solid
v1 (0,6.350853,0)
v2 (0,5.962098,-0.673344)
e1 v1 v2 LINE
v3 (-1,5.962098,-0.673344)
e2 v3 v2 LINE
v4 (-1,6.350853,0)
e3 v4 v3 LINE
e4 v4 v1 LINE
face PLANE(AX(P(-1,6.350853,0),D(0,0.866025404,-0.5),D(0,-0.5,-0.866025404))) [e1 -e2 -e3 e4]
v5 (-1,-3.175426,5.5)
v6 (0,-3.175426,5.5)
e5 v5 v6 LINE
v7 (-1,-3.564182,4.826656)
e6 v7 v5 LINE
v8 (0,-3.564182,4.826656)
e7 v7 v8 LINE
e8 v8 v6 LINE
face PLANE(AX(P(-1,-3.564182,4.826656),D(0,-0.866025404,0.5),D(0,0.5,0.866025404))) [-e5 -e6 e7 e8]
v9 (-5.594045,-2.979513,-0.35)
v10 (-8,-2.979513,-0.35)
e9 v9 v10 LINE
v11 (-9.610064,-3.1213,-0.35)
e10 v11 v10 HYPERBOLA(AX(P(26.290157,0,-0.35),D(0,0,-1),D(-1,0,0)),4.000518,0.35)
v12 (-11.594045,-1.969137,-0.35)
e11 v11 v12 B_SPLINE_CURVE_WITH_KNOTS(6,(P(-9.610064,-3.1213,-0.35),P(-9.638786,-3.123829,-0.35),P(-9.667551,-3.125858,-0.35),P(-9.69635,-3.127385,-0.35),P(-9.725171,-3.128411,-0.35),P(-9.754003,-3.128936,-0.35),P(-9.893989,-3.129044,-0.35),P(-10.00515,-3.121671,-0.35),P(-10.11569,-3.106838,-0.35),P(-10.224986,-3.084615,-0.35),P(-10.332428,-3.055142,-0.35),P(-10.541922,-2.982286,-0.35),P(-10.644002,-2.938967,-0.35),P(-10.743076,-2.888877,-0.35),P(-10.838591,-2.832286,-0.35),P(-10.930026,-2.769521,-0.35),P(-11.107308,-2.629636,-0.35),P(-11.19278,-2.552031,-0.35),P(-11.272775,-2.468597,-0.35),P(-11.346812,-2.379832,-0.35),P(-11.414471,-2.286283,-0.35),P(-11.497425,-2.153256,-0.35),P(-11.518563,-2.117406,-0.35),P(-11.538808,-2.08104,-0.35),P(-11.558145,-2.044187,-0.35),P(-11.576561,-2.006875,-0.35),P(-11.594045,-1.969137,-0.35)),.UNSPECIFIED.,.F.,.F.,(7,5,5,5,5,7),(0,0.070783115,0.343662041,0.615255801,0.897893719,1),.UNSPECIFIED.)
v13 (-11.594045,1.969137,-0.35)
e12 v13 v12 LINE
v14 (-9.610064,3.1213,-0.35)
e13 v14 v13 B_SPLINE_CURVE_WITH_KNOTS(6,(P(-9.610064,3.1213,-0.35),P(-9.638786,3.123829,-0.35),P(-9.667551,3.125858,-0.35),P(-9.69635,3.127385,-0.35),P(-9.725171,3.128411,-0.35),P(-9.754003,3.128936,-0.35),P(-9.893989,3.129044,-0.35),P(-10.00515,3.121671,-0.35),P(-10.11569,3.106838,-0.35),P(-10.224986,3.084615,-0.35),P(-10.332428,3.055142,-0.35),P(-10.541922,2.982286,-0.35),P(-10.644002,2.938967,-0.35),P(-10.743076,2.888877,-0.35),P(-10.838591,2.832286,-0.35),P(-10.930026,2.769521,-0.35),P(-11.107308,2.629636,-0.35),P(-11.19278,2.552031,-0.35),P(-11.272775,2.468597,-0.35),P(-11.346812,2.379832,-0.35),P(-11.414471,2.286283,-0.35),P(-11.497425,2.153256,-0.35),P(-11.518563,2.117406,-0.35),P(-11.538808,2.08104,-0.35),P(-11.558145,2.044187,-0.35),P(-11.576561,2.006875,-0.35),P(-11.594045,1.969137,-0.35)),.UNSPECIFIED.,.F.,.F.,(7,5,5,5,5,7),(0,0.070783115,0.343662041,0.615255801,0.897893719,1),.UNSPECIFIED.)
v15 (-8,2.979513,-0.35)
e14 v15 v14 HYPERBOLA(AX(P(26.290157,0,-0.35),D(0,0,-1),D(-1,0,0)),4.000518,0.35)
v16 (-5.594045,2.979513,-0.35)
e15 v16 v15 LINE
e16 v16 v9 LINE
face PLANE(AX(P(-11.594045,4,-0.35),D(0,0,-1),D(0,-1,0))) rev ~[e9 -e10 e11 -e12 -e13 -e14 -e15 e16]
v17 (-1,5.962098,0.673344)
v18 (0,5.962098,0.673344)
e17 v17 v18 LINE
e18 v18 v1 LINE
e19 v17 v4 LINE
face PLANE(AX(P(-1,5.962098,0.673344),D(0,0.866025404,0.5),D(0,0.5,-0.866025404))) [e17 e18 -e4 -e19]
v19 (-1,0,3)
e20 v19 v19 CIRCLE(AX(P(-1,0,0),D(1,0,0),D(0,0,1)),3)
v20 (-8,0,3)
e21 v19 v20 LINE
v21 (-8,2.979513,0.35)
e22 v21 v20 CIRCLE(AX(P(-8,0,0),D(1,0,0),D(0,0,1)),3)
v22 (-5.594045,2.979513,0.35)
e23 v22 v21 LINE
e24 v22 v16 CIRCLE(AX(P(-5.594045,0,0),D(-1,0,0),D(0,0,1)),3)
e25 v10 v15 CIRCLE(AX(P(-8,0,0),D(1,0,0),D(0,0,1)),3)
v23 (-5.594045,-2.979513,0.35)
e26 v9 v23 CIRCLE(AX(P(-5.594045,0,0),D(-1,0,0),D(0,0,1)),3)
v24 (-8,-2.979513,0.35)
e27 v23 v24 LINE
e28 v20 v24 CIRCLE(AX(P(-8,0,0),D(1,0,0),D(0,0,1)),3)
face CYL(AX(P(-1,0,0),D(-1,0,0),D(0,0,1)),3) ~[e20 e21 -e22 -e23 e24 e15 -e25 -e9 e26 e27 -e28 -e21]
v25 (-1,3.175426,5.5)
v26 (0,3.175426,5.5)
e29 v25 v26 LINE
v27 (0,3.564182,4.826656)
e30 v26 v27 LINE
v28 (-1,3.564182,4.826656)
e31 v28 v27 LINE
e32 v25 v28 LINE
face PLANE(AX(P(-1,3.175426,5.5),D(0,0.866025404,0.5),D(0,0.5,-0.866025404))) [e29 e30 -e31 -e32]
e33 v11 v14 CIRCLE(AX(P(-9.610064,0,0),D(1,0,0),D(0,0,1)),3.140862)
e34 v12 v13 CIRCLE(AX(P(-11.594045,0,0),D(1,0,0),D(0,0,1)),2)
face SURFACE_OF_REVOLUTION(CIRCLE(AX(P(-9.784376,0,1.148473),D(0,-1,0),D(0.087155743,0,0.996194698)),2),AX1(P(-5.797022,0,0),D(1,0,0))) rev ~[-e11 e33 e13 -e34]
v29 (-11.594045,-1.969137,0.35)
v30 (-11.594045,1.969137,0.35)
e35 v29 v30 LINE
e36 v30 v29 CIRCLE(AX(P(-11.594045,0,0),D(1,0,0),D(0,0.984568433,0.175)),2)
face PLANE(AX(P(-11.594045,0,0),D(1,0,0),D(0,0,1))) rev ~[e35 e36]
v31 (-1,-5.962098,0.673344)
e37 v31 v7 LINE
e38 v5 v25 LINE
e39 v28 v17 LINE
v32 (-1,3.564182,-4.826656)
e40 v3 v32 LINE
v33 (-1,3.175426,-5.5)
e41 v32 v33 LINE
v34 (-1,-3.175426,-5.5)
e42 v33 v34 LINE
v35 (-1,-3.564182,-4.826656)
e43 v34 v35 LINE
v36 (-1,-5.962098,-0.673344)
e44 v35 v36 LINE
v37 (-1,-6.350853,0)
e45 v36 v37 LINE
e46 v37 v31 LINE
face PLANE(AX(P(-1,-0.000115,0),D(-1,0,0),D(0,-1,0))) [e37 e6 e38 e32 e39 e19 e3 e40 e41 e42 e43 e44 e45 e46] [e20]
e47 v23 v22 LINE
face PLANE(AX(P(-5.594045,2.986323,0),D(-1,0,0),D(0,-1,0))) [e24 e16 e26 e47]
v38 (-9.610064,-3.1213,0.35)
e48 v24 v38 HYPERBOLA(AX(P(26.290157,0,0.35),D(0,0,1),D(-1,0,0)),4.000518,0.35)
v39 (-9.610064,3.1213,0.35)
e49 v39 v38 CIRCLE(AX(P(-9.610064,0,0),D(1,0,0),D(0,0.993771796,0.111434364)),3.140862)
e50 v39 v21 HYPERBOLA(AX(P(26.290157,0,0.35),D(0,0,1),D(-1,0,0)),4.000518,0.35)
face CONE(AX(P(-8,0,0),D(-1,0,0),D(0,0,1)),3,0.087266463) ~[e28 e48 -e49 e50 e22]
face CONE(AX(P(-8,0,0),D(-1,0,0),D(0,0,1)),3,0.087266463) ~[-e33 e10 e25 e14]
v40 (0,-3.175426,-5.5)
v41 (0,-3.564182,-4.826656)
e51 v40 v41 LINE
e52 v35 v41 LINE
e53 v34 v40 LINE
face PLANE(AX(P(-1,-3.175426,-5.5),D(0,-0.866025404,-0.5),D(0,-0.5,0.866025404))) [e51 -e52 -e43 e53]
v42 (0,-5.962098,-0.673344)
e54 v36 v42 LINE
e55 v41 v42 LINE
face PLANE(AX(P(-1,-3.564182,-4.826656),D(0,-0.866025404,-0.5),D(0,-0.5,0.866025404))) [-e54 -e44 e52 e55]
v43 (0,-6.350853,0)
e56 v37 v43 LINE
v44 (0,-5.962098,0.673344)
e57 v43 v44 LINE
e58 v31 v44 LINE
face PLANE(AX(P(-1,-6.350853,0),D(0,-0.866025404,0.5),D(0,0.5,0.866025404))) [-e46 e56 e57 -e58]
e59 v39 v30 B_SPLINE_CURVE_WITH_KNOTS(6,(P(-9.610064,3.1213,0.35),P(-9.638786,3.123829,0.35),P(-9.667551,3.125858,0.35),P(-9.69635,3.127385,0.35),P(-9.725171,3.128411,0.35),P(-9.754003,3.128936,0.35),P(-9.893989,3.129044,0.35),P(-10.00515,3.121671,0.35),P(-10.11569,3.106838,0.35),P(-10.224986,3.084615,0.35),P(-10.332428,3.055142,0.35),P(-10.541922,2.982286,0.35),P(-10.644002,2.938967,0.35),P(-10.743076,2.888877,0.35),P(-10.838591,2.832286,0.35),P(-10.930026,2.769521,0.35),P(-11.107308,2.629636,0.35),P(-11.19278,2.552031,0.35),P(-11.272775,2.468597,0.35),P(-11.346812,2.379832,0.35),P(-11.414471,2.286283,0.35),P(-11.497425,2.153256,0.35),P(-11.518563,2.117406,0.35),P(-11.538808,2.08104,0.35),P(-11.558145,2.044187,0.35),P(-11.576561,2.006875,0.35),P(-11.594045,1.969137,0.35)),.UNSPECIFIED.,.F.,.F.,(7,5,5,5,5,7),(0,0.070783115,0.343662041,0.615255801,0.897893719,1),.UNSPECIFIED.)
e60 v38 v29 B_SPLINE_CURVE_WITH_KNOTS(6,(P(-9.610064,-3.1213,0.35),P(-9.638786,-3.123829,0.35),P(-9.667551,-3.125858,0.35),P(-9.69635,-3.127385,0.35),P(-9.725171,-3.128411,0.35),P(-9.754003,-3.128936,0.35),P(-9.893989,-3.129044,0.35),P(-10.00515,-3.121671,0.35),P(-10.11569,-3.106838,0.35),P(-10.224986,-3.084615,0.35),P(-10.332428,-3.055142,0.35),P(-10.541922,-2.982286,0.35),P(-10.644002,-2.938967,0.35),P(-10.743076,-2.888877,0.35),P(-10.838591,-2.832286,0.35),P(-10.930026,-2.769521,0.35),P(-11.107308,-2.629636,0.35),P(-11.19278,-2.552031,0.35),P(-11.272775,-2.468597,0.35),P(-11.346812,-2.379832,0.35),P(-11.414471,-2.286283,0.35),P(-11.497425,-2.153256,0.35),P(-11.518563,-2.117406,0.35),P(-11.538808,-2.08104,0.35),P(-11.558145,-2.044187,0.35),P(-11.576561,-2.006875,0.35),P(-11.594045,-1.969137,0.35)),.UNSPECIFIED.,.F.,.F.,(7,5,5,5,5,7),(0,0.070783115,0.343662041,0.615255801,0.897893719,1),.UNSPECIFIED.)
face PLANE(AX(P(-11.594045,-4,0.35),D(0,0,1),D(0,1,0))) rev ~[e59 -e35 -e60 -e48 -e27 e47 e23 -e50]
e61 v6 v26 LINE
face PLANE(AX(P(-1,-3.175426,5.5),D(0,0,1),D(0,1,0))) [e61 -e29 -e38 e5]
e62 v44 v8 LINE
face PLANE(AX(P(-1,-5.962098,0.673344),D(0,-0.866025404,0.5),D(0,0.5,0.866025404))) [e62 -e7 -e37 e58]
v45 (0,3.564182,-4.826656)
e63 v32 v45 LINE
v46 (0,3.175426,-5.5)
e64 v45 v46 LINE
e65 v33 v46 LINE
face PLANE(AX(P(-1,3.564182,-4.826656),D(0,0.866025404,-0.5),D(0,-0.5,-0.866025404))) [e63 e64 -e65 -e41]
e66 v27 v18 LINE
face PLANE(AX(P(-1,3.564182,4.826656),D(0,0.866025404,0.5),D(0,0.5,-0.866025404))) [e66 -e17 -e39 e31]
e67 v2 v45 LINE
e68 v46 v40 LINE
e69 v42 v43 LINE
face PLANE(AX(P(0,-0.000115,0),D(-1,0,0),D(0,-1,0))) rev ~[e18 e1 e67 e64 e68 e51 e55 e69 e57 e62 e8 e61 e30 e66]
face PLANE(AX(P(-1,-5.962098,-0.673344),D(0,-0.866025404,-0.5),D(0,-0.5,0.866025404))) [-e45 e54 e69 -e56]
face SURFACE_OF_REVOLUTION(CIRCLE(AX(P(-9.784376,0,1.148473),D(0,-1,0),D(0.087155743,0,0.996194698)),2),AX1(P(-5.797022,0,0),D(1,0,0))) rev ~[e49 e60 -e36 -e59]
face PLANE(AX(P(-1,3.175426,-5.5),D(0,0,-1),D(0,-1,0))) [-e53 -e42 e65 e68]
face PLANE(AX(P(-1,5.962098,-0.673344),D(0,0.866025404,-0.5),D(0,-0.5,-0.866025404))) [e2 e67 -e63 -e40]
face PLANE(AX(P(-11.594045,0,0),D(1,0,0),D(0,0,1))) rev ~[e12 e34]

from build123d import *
from build123d import SkipClean  # not in build123d's __all__

# Parameters (mm, degrees)
F3_DEPTH = 6
F4_W     = 13.7017059222
F4_H     = 13
F4_R     = 3
F5_DEPTH = 25
F6_DEPTH = 1


with BuildPart() as f1:
    # F0 (on Front) → F1 (revolve)
    with BuildSketch(Plane.XZ):
        with BuildLine():
            Line((-11.5940445242, 0), (0, 0))
            Line((0, 0), (0, 6))
            Line((0, 6), (-1, 6))
            Line((-1, 6), (-1, 3))
            Line((-1, 3), (-8, 3))
            Line((-8, 3), (-9.6100640914, 3.1408623555))
            ThreePointArc((-9.6100640914, 3.1408623555), (-10.7813661664, 2.8822577685), (-11.5940445242, 2))
            Line((-11.5940445242, 2), (-11.5940445242, 0))
        make_face()
    revolve(axis=Axis((-5.7970222621, 0, 0), (1, 0, 0)))

    # F2 (on face) → F3 (cut)
    with BuildSketch(Plane(origin=(-11.5940445242, 0, 0), x_dir=(0, -1, 0), z_dir=(-1, 0, 0))):
        with BuildLine():
            ThreePointArc((-1.9691368668, -0.35), (-2, 0), (-1.9691368668, 0.35))
            Line((-1.9691368668, 0.35), (-4, 0.35))
            Line((-4, 0.35), (-4, -0.35))
            Line((-4, -0.35), (-2.9795133831, -0.35))
            Line((-2.9795133831, -0.35), (-1.9691368668, -0.35))
        make_face()
        with BuildLine():
            Line((1.9691368668, 0.35), (0.25, 0.35))
            Line((0.25, 0.35), (0.25, 0))
            Line((0.25, 0), (0.25, -0.35))
            Line((0.25, -0.35), (1.9691368668, -0.35))
            ThreePointArc((1.9691368668, -0.35), (1.9922692757, -0.1756790632), (2, 0))
            ThreePointArc((2, 0), (1.9922692757, 0.1756790632), (1.9691368668, 0.35))
        make_face()
        with BuildLine():
            Line((-0.25, 0), (-0.25, 0.35))
            Line((-0.25, 0.35), (-1.9691368668, 0.35))
            ThreePointArc((-1.9691368668, 0.35), (-2, 0), (-1.9691368668, -0.35))
            Line((-1.9691368668, -0.35), (-0.25, -0.35))
            Line((-0.25, -0.35), (-0.25, 0))
        make_face()
        Polygon((0.25, 0), (0.25, 0.35), (-0.25, 0.35), (-0.25, 0), (-0.25, -0.35), (0.25, -0.35), align=None)
        with BuildLine():
            Line((4, 0.35), (1.9691368668, 0.35))
            ThreePointArc((1.9691368668, 0.35), (1.9922692757, 0.1756790632), (2, 0))
            ThreePointArc((2, 0), (1.9922692757, -0.1756790632), (1.9691368668, -0.35))
            Line((1.9691368668, -0.35), (2.9795133831, -0.35))
            Line((2.9795133831, -0.35), (4, -0.35))
            Line((4, -0.35), (4, 0.35))
        make_face()
    extrude(amount=-F3_DEPTH, mode=Mode.SUBTRACT)

    # F4 (on face) → F5 (cut)
    with BuildSketch(Plane(origin=(-1, 0, 0), x_dir=(0, -1, 0), z_dir=(-1, 0, 0))):
        Rectangle(F4_W, F4_H)
        Polygon((-6.3508529611, 0), (-3.1754264805, 5.5), (3.1754264805, 5.5), (6.3508529611, 0), (3.1754264805, -5.5), (-3.1754264805, -5.5), align=None, mode=Mode.SUBTRACT)
        with BuildLine():
            Line((2.3979157617, 5.5), (-2.3979157617, 5.5))
            ThreePointArc((-2.3979157617, 5.5), (-3, 5.1961524227), (-3.56418184, 4.8266559657))
            Line((-3.56418184, 4.8266559657), (-5.9620976016, 0.6733440343))
            ThreePointArc((-5.9620976016, 0.6733440343), (-6, 0), (-5.9620976016, -0.6733440343))
            Line((-5.9620976016, -0.6733440343), (-3.56418184, -4.8266559657))
            ThreePointArc((-3.56418184, -4.8266559657), (-3, -5.1961524227), (-2.3979157617, -5.5))
            Line((-2.3979157617, -5.5), (2.3979157617, -5.5))
            ThreePointArc((2.3979157617, -5.5), (3, -5.1961524227), (3.56418184, -4.8266559657))
            Line((3.56418184, -4.8266559657), (5.9620976016, -0.6733440343))
            ThreePointArc((5.9620976016, -0.6733440343), (5.9905169063, -0.3372049749), (6, 0))
            ThreePointArc((6, 0), (5.9905169063, 0.3372049749), (5.9620976016, 0.6733440343))
            Line((5.9620976016, 0.6733440343), (3.56418184, 4.8266559657))
            ThreePointArc((3.56418184, 4.8266559657), (3, 5.1961524227), (2.3979157617, 5.5))
        make_face()
        Circle(F4_R, mode=Mode.SUBTRACT)
    with SkipClean():  # cleaning this boolean's faces spoils the solid; the shape is the same uncleaned
        extrude(amount=-F5_DEPTH, mode=Mode.SUBTRACT)

    # F4 (on face) → F6 (join)
    with BuildSketch(Plane(origin=(-1, 0, 0), x_dir=(0, -1, 0), z_dir=(-1, 0, 0))):
        with BuildLine():
            Line((2.3979157617, 5.5), (-2.3979157617, 5.5))
            ThreePointArc((-2.3979157617, 5.5), (-3, 5.1961524227), (-3.56418184, 4.8266559657))
            Line((-3.56418184, 4.8266559657), (-5.9620976016, 0.6733440343))
            ThreePointArc((-5.9620976016, 0.6733440343), (-6, 0), (-5.9620976016, -0.6733440343))
            Line((-5.9620976016, -0.6733440343), (-3.56418184, -4.8266559657))
            ThreePointArc((-3.56418184, -4.8266559657), (-3, -5.1961524227), (-2.3979157617, -5.5))
            Line((-2.3979157617, -5.5), (2.3979157617, -5.5))
            ThreePointArc((2.3979157617, -5.5), (3, -5.1961524227), (3.56418184, -4.8266559657))
            Line((3.56418184, -4.8266559657), (5.9620976016, -0.6733440343))
            ThreePointArc((5.9620976016, -0.6733440343), (5.9905169063, -0.3372049749), (6, 0))
            ThreePointArc((6, 0), (5.9905169063, 0.3372049749), (5.9620976016, 0.6733440343))
            Line((5.9620976016, 0.6733440343), (3.56418184, 4.8266559657))
            ThreePointArc((3.56418184, 4.8266559657), (3, 5.1961524227), (2.3979157617, 5.5))
        make_face()
        Circle(F4_R, mode=Mode.SUBTRACT)
        with BuildLine():
            Line((-2.3979157617, 5.5), (-3.1754264805, 5.5))
            Line((-3.1754264805, 5.5), (-3.56418184, 4.8266559657))
            ThreePointArc((-3.56418184, 4.8266559657), (-3, 5.1961524227), (-2.3979157617, 5.5))
        make_face()
        with BuildLine():
            Line((3.1754264805, 5.5), (2.3979157617, 5.5))
            ThreePointArc((2.3979157617, 5.5), (3, 5.1961524227), (3.56418184, 4.8266559657))
            Line((3.56418184, 4.8266559657), (3.1754264805, 5.5))
        make_face()
        with BuildLine():
            Line((6.3508529611, 0), (5.9620976016, 0.6733440343))
            ThreePointArc((5.9620976016, 0.6733440343), (5.9905169063, 0.3372049749), (6, 0))
            ThreePointArc((6, 0), (5.9905169063, -0.3372049749), (5.9620976016, -0.6733440343))
            Line((5.9620976016, -0.6733440343), (6.3508529611, 0))
        make_face()
        with BuildLine():
            ThreePointArc((3.56418184, -4.8266559657), (3, -5.1961524227), (2.3979157617, -5.5))
            Line((2.3979157617, -5.5), (3.1754264805, -5.5))
            Line((3.1754264805, -5.5), (3.56418184, -4.8266559657))
        make_face()
        with BuildLine():
            ThreePointArc((-2.3979157617, -5.5), (-3, -5.1961524227), (-3.56418184, -4.8266559657))
            Line((-3.56418184, -4.8266559657), (-3.1754264805, -5.5))
            Line((-3.1754264805, -5.5), (-2.3979157617, -5.5))
        make_face()
        with BuildLine():
            ThreePointArc((-5.9620976016, -0.6733440343), (-6, 0), (-5.9620976016, 0.6733440343))
            Line((-5.9620976016, 0.6733440343), (-6.3508529611, 0))
            Line((-6.3508529611, 0), (-5.9620976016, -0.6733440343))
        make_face()
    extrude(amount=-F6_DEPTH)


solid = f1.part
